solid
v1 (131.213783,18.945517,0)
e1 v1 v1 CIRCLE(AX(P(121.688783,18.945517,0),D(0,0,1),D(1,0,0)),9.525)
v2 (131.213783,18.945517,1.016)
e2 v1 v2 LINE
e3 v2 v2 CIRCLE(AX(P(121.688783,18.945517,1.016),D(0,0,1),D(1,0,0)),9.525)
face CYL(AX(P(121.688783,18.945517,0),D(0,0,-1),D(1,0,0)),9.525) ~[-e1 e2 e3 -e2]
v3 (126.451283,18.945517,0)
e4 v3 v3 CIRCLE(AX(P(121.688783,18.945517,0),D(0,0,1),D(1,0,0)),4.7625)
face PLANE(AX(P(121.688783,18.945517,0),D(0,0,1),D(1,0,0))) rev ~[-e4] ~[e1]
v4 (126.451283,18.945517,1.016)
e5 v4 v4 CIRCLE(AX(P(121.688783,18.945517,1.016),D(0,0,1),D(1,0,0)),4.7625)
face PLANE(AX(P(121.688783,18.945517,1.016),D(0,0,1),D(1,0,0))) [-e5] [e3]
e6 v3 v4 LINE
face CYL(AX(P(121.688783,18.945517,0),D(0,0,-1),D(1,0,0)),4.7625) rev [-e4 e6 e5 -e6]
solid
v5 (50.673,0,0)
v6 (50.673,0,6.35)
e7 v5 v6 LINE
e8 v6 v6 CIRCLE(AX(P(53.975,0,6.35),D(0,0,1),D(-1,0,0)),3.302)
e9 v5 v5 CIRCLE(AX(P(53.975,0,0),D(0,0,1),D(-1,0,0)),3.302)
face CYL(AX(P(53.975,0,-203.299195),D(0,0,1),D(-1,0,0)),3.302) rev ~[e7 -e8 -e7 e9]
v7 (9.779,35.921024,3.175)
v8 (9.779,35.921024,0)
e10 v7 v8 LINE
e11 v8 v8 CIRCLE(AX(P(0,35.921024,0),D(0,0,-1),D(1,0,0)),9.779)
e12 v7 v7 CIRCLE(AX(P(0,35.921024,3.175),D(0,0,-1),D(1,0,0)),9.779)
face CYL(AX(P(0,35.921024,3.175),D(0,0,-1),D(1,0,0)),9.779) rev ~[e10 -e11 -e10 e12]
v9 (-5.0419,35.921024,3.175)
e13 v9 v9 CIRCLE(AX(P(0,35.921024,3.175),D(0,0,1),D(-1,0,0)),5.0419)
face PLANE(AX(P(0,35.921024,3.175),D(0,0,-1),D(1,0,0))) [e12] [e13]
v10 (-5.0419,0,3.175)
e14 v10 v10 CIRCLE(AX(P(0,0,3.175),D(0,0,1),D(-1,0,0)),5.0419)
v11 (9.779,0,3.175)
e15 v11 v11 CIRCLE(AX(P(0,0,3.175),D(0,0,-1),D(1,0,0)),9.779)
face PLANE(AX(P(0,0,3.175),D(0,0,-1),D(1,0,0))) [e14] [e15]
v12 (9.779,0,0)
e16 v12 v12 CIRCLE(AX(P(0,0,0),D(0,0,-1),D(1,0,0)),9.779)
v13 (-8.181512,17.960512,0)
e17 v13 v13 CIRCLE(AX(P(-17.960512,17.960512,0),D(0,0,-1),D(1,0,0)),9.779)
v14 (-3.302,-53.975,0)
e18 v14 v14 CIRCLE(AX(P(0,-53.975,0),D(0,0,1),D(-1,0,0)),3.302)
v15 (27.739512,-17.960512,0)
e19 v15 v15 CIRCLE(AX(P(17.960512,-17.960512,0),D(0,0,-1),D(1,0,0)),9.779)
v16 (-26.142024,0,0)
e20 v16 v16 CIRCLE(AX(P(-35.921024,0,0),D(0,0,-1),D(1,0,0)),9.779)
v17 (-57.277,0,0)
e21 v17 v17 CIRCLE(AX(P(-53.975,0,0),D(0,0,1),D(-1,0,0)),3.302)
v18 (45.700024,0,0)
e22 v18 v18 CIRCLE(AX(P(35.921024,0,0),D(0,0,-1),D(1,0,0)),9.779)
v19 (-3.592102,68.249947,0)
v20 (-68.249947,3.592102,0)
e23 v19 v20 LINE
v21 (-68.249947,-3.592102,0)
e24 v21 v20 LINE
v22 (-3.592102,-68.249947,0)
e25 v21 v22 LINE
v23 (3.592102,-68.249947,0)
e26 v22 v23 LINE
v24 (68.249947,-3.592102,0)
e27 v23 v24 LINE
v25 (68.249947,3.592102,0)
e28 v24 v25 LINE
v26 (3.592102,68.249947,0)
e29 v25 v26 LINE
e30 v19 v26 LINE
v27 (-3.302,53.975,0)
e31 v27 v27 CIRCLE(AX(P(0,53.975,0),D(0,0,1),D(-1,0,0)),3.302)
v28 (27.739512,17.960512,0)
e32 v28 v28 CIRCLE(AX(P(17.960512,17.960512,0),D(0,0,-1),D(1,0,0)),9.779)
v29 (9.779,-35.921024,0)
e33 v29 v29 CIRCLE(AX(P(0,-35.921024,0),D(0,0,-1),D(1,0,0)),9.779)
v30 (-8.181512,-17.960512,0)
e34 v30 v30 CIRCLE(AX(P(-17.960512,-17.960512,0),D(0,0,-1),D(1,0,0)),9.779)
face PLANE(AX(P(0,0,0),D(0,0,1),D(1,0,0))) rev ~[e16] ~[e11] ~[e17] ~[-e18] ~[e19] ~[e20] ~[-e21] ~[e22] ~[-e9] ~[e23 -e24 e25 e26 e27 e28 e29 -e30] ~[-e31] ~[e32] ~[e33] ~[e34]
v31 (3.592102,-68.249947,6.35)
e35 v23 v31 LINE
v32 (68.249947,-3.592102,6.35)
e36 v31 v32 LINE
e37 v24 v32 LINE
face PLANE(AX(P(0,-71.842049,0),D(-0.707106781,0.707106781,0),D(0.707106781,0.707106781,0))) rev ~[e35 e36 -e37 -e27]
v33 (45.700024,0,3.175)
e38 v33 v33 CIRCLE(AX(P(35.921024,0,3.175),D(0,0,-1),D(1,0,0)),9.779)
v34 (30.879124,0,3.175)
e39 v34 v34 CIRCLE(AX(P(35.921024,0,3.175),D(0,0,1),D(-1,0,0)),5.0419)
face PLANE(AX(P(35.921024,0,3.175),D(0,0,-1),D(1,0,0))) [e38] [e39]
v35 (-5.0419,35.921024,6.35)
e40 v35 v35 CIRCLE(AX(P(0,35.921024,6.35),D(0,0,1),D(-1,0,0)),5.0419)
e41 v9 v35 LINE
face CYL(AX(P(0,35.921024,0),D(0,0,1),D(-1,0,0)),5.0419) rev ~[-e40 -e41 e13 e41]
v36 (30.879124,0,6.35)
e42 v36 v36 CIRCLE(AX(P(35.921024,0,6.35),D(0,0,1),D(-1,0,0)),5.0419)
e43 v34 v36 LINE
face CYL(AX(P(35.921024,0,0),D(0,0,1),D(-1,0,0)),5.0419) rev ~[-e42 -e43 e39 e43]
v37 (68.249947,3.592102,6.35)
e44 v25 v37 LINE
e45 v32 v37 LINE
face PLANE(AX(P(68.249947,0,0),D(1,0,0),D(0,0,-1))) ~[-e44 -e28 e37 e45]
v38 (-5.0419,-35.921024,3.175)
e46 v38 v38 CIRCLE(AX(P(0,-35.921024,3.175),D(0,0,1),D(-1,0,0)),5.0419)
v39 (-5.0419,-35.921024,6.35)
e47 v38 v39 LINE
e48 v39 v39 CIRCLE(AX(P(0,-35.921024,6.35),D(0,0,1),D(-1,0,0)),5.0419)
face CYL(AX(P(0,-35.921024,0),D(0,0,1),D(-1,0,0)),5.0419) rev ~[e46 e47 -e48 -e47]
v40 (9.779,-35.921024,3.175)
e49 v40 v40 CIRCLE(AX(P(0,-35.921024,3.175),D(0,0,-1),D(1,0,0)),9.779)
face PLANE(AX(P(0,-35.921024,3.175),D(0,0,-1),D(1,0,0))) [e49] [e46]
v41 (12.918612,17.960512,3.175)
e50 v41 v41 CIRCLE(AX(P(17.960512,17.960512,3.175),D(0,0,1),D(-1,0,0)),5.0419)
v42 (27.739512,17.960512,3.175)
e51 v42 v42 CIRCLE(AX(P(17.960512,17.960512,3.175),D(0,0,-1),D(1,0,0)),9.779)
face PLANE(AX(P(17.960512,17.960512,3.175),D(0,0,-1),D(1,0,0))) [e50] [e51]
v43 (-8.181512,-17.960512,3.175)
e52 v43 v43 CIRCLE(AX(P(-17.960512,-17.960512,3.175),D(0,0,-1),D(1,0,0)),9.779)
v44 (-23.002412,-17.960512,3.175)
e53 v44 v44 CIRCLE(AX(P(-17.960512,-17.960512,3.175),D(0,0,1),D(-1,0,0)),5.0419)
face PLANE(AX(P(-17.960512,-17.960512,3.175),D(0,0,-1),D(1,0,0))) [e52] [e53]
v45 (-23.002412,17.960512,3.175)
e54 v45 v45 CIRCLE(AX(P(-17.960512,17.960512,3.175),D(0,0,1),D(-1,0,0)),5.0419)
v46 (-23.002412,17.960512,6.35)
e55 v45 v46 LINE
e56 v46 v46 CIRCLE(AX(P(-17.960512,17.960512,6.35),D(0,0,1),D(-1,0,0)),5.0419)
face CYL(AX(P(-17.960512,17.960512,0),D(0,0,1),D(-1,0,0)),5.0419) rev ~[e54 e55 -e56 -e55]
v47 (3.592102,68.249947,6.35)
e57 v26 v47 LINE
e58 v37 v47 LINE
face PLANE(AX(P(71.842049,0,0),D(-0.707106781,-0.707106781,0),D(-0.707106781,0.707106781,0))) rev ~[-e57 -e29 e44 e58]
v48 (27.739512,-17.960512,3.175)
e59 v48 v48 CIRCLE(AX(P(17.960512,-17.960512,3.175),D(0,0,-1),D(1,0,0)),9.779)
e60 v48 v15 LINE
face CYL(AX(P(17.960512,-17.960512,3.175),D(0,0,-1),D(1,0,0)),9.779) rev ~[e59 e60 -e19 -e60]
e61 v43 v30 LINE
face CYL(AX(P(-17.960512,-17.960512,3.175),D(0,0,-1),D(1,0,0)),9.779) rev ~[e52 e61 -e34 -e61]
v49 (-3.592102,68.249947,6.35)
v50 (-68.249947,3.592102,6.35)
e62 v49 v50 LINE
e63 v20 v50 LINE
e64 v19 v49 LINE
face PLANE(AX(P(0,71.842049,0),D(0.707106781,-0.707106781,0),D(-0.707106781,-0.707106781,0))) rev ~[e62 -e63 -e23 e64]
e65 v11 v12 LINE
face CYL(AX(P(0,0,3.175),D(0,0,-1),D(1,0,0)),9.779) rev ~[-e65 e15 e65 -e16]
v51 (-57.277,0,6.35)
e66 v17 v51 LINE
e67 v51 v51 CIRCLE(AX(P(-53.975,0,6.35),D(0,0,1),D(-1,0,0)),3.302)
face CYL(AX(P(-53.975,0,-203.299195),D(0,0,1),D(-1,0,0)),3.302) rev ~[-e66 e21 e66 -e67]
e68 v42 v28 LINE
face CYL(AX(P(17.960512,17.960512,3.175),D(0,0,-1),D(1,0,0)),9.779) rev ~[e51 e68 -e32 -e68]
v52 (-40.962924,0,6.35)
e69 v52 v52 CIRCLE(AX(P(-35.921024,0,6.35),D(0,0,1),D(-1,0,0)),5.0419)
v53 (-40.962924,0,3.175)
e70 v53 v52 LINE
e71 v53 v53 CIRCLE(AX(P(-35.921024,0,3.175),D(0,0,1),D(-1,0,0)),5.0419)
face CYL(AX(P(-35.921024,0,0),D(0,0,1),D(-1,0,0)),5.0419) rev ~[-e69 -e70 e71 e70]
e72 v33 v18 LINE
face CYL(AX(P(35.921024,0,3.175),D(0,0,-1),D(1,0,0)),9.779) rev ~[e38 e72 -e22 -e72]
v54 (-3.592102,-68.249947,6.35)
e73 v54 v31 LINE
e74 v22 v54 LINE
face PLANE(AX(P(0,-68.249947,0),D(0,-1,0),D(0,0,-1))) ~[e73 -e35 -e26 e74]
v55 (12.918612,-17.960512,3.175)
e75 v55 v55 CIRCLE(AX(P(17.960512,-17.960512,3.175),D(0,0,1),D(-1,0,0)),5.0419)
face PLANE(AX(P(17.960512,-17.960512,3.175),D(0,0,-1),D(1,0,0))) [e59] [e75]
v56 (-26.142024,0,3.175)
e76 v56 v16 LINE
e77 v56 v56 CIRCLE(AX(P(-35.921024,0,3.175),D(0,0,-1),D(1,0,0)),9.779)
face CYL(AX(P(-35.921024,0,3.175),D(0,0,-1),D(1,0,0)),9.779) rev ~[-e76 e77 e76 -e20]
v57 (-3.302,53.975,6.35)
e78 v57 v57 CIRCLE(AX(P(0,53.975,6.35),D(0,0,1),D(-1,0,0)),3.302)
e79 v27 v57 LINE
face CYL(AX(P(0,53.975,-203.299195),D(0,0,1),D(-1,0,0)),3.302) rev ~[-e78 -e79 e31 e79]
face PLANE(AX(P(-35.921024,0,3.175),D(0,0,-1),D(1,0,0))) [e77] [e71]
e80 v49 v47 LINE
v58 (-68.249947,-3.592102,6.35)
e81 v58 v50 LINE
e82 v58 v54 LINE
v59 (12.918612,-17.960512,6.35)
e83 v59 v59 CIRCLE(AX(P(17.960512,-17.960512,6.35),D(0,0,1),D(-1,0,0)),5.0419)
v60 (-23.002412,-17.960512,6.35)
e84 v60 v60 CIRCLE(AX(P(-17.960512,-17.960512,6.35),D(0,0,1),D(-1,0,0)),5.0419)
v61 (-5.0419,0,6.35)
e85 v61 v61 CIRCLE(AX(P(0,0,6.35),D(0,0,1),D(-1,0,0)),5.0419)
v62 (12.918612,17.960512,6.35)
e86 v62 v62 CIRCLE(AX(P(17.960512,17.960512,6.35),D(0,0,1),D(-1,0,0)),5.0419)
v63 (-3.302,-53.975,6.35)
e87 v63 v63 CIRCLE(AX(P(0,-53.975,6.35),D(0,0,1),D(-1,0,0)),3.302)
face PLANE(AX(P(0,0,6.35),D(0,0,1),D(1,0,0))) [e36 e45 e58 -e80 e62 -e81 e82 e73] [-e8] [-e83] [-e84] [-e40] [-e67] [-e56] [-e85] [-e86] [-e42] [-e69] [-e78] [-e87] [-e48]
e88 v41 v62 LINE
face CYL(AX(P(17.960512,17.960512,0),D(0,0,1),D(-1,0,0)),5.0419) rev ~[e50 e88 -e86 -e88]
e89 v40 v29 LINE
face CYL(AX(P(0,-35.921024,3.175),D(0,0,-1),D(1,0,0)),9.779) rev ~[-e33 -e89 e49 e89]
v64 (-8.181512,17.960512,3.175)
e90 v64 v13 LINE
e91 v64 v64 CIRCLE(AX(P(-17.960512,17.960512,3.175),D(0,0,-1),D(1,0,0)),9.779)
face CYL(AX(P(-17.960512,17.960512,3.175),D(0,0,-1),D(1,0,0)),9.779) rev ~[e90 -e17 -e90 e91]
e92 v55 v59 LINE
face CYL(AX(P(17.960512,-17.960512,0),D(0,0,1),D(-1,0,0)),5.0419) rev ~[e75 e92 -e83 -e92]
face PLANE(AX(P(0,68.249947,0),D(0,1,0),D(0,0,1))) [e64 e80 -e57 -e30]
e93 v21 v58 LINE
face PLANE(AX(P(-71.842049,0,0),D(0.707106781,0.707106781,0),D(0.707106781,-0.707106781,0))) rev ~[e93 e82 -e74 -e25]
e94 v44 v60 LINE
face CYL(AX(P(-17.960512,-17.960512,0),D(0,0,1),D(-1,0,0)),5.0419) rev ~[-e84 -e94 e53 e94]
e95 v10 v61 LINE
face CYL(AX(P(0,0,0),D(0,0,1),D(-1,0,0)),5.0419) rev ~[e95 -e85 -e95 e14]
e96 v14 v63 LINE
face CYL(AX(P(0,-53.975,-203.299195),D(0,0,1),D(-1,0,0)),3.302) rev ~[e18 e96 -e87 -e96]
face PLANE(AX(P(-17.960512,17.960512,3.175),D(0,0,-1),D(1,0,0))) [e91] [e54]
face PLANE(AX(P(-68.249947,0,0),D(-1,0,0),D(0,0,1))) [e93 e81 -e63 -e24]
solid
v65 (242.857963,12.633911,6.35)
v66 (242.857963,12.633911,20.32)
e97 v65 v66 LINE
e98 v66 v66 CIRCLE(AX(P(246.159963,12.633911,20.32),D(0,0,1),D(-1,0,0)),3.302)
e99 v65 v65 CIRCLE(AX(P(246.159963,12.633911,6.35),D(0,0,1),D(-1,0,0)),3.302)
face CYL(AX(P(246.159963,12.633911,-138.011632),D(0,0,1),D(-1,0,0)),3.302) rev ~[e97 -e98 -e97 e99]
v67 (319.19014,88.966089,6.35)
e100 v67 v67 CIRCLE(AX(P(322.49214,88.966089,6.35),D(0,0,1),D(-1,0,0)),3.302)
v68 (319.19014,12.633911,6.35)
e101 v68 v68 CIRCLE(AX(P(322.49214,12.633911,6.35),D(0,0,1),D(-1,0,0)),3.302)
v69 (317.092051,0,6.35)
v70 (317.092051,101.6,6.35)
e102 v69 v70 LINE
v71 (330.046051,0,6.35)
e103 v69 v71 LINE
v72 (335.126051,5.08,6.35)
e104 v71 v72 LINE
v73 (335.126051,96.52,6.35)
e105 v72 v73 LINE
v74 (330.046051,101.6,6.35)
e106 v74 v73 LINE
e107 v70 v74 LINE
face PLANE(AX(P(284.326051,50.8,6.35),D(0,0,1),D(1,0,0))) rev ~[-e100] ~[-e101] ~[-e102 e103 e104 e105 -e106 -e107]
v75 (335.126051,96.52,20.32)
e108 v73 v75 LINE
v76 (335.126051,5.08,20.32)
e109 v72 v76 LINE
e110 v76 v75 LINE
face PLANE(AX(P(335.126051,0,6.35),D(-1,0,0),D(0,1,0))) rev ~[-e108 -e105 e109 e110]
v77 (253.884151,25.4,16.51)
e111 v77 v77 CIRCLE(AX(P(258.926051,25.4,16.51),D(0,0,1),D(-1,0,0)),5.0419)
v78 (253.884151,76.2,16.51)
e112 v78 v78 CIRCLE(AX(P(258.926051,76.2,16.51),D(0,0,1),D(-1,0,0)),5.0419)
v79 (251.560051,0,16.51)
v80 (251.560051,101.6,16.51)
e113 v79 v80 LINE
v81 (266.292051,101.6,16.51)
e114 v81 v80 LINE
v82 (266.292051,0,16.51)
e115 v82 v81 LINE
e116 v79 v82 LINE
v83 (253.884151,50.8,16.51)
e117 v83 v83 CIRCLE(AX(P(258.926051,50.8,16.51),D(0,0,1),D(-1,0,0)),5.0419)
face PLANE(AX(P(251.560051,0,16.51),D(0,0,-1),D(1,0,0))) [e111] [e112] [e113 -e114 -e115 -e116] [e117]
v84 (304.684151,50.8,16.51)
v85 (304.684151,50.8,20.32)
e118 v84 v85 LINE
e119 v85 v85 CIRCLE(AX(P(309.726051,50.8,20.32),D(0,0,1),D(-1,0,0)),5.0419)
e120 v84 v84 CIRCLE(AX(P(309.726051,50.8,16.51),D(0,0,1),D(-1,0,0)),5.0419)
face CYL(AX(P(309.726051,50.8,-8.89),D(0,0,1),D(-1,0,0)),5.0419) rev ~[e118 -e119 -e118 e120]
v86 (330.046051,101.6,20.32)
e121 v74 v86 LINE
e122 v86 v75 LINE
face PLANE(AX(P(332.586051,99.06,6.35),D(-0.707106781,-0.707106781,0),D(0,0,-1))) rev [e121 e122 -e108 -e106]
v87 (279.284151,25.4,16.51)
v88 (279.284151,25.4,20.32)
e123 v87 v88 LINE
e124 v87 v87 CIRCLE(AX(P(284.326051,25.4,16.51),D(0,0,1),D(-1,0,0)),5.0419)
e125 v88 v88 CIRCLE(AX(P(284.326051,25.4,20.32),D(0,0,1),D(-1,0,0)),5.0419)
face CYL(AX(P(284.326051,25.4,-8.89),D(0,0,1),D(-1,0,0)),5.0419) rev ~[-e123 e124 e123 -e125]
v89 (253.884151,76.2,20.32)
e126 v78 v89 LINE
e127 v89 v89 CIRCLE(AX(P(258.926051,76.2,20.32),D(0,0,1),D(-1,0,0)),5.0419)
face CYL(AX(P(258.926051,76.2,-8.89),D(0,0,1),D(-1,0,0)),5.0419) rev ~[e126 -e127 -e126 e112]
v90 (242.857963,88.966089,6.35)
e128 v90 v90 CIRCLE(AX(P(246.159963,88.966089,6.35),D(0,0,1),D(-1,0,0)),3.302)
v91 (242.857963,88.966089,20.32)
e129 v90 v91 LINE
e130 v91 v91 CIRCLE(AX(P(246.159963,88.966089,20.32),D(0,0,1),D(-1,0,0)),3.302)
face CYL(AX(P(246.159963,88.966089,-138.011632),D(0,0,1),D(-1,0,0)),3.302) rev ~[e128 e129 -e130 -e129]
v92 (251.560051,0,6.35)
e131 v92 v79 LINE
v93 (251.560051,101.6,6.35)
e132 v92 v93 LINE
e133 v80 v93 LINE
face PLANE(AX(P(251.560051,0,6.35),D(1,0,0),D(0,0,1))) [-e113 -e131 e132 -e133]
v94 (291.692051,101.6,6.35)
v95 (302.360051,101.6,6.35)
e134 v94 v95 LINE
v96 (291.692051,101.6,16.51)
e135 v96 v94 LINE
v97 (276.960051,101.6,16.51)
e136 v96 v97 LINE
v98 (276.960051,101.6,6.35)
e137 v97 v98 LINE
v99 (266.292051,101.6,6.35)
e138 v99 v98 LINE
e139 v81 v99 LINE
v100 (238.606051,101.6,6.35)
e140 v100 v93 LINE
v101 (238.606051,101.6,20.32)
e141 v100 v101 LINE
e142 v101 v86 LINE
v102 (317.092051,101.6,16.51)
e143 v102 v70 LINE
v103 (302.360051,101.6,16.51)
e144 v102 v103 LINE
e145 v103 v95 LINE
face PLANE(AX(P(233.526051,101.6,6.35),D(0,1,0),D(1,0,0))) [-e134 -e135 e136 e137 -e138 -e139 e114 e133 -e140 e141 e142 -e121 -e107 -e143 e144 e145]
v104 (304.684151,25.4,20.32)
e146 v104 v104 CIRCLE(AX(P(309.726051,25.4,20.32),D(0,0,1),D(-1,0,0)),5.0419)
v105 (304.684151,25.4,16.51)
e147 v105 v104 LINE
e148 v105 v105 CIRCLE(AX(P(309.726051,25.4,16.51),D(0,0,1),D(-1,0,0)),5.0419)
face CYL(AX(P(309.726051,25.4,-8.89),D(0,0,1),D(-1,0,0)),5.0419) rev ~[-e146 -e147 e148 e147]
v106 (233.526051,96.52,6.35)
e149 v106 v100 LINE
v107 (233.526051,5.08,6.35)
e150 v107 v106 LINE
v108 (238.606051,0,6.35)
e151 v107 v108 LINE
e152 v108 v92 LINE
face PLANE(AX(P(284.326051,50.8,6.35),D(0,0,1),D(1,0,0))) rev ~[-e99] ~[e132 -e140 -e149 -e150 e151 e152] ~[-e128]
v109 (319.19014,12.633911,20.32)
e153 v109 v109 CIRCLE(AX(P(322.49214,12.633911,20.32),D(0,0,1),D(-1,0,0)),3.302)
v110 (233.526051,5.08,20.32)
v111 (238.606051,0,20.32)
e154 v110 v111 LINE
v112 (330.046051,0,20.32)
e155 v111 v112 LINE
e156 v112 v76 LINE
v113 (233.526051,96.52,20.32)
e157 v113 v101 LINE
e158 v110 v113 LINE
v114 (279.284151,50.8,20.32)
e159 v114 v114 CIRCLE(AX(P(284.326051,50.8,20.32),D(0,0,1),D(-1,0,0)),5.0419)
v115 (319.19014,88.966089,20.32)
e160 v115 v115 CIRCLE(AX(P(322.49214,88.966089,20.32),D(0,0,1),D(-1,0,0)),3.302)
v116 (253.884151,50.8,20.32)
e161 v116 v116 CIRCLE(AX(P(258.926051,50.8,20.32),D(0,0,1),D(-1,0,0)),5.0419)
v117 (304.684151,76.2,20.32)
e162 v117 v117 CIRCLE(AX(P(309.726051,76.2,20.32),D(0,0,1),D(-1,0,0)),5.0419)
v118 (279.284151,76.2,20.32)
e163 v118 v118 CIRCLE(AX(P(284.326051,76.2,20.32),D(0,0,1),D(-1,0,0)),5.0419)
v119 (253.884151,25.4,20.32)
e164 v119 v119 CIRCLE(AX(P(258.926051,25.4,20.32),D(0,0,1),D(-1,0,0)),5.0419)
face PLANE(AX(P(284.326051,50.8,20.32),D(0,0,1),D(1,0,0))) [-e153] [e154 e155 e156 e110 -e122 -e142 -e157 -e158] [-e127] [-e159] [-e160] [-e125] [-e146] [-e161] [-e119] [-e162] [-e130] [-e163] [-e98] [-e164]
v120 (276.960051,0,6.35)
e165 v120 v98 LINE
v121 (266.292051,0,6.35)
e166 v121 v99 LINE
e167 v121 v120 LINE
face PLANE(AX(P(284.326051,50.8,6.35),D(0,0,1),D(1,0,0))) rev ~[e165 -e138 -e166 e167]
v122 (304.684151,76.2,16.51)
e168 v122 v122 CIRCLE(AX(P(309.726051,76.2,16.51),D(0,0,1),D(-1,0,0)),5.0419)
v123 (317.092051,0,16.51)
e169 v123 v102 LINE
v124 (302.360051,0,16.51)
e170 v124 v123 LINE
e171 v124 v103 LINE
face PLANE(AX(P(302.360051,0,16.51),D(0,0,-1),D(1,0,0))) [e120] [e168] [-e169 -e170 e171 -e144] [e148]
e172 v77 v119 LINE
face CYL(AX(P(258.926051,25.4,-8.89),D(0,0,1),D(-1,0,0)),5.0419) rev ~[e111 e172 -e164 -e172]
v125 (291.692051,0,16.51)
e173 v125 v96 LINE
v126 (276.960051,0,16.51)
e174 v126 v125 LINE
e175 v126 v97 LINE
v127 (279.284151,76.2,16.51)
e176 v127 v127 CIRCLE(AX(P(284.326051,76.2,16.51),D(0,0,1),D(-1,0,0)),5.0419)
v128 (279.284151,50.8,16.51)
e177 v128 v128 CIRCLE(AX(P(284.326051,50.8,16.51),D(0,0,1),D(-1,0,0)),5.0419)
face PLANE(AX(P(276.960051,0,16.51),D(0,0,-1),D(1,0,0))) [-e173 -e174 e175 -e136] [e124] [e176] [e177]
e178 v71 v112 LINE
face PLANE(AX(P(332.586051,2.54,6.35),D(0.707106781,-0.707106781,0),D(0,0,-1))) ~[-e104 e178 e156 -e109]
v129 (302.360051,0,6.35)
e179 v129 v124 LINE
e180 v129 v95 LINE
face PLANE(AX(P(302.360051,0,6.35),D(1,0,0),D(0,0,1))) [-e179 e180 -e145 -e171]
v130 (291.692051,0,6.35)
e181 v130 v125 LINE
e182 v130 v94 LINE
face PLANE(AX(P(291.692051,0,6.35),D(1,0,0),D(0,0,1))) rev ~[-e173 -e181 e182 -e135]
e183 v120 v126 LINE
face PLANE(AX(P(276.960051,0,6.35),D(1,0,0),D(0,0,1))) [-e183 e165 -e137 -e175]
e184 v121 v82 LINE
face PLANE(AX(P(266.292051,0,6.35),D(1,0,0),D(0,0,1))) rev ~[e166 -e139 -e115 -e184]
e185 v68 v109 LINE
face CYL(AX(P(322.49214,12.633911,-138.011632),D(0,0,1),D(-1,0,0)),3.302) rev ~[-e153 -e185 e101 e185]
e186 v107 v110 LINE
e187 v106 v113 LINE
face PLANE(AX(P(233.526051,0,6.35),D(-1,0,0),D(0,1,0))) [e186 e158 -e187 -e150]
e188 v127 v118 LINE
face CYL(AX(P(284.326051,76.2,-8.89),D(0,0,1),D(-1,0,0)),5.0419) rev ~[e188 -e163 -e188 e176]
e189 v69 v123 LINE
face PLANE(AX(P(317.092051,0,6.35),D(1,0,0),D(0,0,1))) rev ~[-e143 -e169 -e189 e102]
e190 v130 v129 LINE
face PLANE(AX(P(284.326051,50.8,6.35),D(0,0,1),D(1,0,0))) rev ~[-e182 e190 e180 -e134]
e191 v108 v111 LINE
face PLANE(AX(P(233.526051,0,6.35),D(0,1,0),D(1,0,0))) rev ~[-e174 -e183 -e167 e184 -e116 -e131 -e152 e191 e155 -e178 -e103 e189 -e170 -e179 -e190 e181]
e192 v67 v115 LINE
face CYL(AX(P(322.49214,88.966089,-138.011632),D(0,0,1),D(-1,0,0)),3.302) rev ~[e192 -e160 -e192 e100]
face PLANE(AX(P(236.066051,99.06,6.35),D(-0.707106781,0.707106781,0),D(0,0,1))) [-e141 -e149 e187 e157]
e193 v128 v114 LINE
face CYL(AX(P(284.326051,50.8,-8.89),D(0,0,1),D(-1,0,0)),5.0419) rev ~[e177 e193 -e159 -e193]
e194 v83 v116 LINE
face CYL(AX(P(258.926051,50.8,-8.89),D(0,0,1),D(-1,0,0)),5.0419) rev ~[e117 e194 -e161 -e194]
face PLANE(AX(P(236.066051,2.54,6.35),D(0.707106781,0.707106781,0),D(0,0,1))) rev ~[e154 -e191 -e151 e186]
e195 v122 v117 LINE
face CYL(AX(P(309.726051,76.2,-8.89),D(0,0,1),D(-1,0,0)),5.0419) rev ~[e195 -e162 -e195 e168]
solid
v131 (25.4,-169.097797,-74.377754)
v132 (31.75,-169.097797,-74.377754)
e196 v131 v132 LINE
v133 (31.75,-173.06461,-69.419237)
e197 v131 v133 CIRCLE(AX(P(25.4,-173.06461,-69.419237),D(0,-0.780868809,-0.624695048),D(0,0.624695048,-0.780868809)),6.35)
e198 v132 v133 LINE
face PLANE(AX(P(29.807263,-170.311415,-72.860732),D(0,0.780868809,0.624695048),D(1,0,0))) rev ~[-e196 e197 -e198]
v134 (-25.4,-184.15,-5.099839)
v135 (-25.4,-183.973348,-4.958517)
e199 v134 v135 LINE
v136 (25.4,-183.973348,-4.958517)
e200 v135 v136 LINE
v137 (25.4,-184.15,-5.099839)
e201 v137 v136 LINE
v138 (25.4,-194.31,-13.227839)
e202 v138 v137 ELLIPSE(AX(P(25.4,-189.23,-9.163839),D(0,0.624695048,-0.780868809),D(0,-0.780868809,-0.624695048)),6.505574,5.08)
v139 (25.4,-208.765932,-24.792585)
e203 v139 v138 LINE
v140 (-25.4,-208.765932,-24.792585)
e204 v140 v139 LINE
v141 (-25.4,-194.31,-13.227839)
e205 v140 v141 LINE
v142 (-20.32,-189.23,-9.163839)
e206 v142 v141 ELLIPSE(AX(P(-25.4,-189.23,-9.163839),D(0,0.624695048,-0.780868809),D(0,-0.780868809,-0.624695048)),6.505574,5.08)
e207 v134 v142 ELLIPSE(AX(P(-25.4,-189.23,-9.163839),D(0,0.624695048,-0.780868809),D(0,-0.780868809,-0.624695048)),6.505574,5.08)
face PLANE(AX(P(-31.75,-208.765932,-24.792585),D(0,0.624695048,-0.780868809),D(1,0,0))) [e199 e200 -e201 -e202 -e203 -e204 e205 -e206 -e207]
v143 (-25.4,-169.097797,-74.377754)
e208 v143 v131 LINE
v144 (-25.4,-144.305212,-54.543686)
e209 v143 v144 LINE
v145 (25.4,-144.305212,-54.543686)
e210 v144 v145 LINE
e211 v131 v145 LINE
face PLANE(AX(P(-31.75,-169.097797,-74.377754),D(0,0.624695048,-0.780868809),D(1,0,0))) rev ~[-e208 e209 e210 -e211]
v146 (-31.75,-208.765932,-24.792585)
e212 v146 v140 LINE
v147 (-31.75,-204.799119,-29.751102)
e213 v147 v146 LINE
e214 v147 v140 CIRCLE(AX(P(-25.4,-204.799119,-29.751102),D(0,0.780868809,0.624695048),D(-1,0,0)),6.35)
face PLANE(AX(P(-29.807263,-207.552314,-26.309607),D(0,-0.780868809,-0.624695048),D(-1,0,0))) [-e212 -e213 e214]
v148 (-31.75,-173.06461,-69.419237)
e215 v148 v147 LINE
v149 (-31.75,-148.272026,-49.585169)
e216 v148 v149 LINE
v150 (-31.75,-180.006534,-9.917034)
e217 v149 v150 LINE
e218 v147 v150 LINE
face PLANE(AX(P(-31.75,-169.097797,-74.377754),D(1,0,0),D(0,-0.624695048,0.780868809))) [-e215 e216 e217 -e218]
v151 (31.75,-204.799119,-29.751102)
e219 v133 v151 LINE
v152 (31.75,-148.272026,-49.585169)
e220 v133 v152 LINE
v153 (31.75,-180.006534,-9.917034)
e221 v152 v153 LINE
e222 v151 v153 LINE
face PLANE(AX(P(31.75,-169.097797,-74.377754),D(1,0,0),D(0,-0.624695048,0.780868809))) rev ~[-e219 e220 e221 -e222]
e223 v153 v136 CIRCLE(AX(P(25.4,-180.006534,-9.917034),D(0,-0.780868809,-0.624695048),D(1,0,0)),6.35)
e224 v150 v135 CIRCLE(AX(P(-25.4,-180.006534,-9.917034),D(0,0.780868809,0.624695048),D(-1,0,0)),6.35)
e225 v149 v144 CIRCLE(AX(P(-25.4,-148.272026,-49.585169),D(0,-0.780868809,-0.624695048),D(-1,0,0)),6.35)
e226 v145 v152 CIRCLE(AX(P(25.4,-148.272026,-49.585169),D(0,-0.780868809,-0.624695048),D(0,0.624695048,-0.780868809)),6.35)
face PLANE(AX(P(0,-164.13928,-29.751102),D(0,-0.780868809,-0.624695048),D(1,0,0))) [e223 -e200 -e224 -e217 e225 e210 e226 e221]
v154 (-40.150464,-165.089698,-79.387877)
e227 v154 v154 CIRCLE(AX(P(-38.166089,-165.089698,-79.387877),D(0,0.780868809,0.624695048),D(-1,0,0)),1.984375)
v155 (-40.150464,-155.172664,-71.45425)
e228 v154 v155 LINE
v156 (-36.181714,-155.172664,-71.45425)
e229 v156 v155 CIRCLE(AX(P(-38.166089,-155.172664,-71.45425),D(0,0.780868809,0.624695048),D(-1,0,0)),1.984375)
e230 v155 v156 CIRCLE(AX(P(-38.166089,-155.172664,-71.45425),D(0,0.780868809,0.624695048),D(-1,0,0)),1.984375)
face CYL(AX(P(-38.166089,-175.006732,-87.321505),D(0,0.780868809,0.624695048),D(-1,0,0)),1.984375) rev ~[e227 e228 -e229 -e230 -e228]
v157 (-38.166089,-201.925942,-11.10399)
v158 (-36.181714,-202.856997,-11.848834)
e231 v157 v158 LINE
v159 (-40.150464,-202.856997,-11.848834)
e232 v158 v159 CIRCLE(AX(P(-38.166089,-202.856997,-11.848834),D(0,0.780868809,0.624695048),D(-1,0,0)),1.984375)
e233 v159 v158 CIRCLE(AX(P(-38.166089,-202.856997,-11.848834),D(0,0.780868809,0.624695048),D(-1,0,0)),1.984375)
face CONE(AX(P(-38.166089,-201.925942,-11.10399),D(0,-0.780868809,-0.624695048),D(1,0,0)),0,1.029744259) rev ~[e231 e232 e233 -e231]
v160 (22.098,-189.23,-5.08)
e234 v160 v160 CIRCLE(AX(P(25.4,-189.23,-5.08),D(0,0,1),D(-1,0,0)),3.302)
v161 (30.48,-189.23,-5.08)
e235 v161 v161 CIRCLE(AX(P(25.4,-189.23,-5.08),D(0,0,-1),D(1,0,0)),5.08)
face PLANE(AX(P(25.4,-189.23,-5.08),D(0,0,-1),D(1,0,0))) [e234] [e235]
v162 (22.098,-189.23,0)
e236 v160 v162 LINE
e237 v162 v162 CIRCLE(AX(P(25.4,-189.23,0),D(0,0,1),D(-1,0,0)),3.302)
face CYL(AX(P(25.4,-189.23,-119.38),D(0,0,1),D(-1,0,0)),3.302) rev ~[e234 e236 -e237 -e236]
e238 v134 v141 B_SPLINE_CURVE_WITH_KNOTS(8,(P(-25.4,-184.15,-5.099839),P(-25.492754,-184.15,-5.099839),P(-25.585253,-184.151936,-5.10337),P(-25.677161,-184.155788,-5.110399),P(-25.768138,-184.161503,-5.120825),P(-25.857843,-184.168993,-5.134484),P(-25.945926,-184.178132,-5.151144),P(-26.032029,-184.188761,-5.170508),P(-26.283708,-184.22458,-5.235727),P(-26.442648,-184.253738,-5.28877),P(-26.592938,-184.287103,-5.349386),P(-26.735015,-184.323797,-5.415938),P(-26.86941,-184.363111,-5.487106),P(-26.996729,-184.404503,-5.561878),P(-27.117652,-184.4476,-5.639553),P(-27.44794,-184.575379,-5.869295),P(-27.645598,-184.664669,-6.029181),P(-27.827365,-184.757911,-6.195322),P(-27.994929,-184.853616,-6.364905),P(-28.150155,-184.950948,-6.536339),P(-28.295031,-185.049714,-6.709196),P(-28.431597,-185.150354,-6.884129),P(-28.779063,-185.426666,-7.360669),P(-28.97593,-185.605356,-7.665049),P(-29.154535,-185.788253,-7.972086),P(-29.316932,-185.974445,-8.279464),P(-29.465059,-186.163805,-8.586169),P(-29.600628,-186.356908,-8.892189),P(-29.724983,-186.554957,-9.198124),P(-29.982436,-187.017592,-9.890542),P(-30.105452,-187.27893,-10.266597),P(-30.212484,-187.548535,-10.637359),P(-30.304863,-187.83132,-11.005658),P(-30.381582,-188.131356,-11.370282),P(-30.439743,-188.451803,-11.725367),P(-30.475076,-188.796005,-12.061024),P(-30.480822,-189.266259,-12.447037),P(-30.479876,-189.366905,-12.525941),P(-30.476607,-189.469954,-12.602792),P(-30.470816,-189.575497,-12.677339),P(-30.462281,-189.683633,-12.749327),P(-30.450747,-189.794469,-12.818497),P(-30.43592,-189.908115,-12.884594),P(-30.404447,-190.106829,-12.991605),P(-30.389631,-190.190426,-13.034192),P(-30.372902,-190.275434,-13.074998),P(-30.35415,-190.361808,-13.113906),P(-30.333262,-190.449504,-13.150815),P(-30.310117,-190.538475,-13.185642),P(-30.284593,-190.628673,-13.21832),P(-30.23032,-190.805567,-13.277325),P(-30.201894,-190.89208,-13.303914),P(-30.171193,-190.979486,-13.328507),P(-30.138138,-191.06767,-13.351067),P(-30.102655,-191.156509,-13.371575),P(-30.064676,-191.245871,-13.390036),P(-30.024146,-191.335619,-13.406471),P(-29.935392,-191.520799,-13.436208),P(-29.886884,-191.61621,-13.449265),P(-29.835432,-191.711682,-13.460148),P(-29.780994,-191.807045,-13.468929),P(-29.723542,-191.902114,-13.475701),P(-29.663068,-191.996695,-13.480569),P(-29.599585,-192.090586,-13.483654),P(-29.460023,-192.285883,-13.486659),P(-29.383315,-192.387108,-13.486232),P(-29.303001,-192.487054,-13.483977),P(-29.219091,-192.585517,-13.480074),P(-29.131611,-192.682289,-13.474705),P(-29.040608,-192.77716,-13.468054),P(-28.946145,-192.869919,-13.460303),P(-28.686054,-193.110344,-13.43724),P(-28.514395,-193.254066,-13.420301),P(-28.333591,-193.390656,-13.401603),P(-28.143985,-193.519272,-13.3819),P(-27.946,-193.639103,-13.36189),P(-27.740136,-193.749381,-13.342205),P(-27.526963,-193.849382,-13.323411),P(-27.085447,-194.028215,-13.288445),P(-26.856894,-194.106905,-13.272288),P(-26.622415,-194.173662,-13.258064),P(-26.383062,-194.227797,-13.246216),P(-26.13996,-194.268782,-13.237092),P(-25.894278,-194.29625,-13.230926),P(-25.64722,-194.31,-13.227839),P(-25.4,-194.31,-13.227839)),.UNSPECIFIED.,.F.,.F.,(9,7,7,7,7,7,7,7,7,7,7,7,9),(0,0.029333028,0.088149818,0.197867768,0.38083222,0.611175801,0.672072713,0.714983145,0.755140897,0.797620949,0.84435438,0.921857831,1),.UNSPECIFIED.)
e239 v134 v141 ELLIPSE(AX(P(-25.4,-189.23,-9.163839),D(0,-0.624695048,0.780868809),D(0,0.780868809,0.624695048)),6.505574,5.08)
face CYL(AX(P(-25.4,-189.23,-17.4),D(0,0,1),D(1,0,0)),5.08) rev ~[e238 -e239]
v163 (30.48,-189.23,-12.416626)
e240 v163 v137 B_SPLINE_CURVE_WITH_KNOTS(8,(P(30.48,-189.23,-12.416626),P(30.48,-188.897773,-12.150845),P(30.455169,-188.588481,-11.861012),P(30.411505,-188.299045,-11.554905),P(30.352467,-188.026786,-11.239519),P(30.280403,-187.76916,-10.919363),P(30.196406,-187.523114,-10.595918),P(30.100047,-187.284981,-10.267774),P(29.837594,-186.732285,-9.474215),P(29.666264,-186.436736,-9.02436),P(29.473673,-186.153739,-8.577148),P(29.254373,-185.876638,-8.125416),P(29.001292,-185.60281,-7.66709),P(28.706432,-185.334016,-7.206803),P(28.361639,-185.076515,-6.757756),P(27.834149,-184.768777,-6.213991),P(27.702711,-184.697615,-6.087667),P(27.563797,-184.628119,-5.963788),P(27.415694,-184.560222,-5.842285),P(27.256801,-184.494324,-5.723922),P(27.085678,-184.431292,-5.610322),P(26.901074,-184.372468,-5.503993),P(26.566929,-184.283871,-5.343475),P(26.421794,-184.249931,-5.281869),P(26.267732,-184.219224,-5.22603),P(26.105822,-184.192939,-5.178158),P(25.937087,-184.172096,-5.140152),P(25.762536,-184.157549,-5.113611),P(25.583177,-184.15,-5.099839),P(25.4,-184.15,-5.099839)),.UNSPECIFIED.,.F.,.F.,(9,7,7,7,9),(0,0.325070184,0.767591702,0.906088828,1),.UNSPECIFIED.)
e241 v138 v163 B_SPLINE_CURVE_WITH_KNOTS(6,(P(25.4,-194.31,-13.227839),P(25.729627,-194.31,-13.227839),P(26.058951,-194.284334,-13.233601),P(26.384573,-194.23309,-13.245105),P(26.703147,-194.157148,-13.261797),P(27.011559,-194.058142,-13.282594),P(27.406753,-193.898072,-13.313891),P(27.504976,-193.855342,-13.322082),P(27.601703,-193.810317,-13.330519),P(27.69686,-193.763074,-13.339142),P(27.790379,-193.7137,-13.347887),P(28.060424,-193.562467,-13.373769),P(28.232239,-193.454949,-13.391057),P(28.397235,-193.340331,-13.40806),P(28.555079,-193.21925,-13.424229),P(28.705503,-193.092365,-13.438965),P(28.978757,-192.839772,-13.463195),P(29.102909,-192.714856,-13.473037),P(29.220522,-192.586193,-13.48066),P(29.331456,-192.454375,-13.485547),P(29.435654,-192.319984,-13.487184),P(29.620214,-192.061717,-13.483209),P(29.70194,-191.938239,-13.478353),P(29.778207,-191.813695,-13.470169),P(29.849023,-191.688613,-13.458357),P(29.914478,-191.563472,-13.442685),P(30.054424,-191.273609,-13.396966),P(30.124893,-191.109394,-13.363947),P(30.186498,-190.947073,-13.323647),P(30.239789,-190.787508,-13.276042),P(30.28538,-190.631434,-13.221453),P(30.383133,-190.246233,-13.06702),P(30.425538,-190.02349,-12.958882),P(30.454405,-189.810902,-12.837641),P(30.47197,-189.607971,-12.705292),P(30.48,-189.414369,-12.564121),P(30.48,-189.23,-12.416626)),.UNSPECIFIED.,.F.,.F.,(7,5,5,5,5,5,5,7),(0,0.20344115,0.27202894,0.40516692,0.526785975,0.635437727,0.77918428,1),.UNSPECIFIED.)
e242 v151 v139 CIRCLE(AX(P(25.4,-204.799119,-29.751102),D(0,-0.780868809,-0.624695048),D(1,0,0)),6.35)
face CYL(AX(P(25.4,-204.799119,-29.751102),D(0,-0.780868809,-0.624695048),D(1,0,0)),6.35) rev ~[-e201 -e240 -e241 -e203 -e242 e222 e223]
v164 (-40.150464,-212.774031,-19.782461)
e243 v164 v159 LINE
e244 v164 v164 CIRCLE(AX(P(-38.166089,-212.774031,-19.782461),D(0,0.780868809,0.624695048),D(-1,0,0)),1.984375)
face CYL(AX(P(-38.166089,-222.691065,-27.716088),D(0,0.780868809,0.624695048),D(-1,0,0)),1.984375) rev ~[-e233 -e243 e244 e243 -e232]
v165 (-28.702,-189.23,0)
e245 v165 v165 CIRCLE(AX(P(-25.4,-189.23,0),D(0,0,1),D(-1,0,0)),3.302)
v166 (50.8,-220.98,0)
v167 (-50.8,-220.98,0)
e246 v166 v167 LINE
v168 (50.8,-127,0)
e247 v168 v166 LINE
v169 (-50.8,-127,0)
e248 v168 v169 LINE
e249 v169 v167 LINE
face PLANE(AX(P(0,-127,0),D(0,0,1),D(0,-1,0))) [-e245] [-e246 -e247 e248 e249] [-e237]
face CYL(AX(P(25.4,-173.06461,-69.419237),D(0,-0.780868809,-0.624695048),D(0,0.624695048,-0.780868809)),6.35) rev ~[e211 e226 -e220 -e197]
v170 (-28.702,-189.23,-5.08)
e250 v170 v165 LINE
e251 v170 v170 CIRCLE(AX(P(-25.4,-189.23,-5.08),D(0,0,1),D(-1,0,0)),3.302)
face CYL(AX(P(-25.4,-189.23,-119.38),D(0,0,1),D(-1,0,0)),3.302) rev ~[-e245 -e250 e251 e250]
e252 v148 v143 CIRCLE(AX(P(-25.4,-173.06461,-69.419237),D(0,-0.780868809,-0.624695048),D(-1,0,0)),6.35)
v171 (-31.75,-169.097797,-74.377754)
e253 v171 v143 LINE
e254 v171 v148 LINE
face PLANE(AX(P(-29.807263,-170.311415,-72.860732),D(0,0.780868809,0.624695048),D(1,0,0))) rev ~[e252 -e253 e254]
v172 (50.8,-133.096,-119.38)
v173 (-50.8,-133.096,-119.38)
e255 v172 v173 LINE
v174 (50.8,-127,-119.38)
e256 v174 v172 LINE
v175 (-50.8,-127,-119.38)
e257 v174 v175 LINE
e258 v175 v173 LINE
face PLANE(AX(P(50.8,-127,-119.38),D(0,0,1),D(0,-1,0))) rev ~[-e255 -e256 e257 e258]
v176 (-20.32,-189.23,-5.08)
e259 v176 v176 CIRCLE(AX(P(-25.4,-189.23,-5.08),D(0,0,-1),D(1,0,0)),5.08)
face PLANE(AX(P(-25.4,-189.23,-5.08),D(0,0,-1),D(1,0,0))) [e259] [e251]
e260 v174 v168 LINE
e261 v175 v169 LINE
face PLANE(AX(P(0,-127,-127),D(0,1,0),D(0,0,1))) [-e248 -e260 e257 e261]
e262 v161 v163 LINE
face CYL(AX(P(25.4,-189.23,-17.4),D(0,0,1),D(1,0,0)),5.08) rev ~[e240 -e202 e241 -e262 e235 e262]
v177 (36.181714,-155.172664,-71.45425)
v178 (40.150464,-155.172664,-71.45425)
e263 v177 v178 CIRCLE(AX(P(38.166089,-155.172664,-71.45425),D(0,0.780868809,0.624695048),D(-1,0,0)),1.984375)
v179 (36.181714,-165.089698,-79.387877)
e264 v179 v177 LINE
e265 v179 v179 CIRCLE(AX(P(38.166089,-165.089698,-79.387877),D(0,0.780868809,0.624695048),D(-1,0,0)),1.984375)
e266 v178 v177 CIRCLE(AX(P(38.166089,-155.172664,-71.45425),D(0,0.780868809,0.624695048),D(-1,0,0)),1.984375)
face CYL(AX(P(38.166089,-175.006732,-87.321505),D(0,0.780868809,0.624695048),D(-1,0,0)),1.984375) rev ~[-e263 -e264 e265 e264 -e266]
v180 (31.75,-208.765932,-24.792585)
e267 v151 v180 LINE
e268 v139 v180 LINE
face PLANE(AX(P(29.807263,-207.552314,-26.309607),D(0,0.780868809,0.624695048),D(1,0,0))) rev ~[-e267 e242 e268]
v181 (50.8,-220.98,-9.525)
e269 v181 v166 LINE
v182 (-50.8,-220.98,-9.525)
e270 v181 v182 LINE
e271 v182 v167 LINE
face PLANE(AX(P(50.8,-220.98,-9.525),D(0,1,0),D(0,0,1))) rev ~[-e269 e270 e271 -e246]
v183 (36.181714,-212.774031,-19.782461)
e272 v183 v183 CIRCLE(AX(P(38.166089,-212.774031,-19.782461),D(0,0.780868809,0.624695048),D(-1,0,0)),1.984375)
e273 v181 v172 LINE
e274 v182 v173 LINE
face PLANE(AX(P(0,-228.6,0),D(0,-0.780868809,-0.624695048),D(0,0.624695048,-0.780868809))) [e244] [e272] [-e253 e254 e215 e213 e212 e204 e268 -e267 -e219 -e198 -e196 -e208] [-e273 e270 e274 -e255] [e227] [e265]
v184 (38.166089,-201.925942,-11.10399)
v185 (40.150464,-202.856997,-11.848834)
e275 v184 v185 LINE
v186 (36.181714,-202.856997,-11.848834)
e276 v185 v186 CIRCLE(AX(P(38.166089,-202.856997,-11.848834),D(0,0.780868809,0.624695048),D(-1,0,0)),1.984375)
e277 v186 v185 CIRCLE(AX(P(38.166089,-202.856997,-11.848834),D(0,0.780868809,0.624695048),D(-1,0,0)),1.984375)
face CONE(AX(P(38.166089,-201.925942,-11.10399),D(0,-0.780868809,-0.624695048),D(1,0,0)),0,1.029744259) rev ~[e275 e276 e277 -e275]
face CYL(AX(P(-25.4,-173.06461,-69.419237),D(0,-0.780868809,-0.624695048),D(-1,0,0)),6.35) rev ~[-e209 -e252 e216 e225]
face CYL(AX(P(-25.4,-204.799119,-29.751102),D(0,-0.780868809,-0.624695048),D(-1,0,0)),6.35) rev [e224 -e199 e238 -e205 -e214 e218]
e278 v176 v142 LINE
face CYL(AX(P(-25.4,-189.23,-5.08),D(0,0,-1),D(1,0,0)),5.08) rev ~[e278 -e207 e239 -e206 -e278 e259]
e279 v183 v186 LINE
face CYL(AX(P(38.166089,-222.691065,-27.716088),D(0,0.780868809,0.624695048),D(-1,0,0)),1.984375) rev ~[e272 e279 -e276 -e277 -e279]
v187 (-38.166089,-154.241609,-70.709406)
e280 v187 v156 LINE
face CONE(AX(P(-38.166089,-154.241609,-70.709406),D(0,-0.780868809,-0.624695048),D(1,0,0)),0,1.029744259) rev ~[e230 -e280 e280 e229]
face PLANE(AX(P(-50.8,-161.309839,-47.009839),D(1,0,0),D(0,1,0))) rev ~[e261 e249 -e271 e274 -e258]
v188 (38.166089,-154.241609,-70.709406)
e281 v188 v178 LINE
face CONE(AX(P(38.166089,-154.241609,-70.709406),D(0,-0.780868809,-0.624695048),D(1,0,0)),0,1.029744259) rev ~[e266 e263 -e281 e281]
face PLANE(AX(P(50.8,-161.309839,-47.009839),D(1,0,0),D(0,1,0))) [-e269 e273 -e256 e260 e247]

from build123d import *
from build123d import SkipClean  # not in build123d's __all__

# Parameters (mm, degrees)
F1_DEPTH        = 6.35
F2_D            = 6.604
F4_D            = 10.0838
F4_CBORE_D      = 19.558
F4_CBORE_DEPTH  = 3.175
F5_SIZE         = 5.08
F6_W            = 101.6
F6_H            = 101.6
F7_DEPTH        = 13.97
F9_D            = 6.604
F10_W           = 14.732
F10_H           = 10.16
F11_DEPTH       = 101.601
F12_SIZE        = 5.08
F13_R           = 9.525
F13_R_2         = 4.7625
F14_DEPTH       = 1.016
F16_DEPTH       = 50.8
F18_D           = 3.96875
F18_DEPTH       = 12.7
F18_TIP         = 1.1923327909
F20_DEPTH       = 119.0509465201
F22_D           = 6.604
F22_CBORE_D     = 10.16
F22_CBORE_DEPTH = 114.3
F23_W           = 63.5
F23_H           = 63.5
F24_DEPTH       = 31.75
F26_D           = 10.0838
F26_DEPTH       = 25.4
F26_TIP         = 3.0294791551
F27_T1_DEPTH    = 47.625
F27_T6_DEPTH    = 31.75
F27_S7_R        = 5.08
F27_T8_DEPTH    = 21
F27_T12_DEPTH   = 31.75
F27_S13_R       = 5.08
F27_T14_DEPTH   = 21


# Not quite as in the source:
# - a fillet or chamfer that OpenCascade refuses, or shapes differently, is made with other operations: its cross-section is extruded or revolved along the edge and cut away or added


with BuildPart() as f1:
    # F0 (on Top) → F1 (new body)
    with BuildSketch(Plane.XY):
        Polygon((-71.8420489686, 0), (0, -71.8420489686), (71.8420489686, 0), (0, 71.8420489686), align=None)
    extrude(amount=F1_DEPTH)

    # F2 (through all)
    with Locations(Plane(origin=(0, 0, 0), x_dir=(1, 0, 0), z_dir=(0, 0, -1))):
        with Locations((0, 53.975), (-53.975, 0), (53.975, 0), (0, -53.975)):
            Hole(F2_D / 2)

    # F4 (through all)
    with Locations(Plane(origin=(0, 0, 0), x_dir=(1, 0, 0), z_dir=(0, 0, -1))):
        with Locations((0, 35.9210244843), (-17.9605122421, 17.9605122421), (-35.9210244843, 0), (-17.9605122421, -17.9605122421), (0, -35.9210244843), (17.9605122421, -17.9605122421), (35.9210244843, 0), (17.9605122421, 17.9605122421), (0, 0)):
            CounterBoreHole(F4_D / 2, F4_CBORE_D / 2, F4_CBORE_DEPTH)

    # F5
    f5_edges = [f1.edges().sort_by_distance(p)[0] for p in [
        (-71.842049, 0, 3.175),
        (0, 71.842049, 3.175),
        (71.842049, 0, 3.175),
        (0, -71.842049, 3.175),
    ]]
    chamfer(f5_edges, length=F5_SIZE)


with BuildPart() as f7:
    # F6 (on face) → F7 (new body)
    with BuildSketch(Plane.XY.offset(6.35)):
        with Locations((284.3260511961, 50.8)):
            Rectangle(F6_W, F6_H)
    extrude(amount=F7_DEPTH)

    # F9 (through all)
    with Locations(Plane(origin=(0, 0, 6.35), x_dir=(1, 0, 0), z_dir=(0, 0, -1))):
        with Locations((246.1599626816, -88.9660885145), (246.1599626816, -12.6339114855), (322.4921397107, -12.6339114855), (322.4921397107, -88.9660885145)):
            Hole(F9_D / 2)

    # F10 (on face) → F11 (cut, through all)
    with BuildSketch(Plane.XZ):
        with Locations((309.7260511961, 11.43)):
            Rectangle(F10_W, F10_H)
        with Locations((284.3260511961, 11.43)):
            Rectangle(F10_W, F10_H)
        with Locations((258.9260511961, 11.43)):
            Rectangle(F10_W, F10_H)
    extrude(amount=-F11_DEPTH, mode=Mode.SUBTRACT)

    # F12
    f12_edges = [f7.edges().sort_by_distance(p)[0] for p in [
        (335.126051, 0, 13.335),
        (233.526051, 0, 13.335),
        (233.526051, 101.6, 13.335),
        (335.126051, 101.6, 13.335),
    ]]
    chamfer(f12_edges, length=F12_SIZE)

    # F26
    with Locations(Plane(origin=(0, 0, 16.51), x_dir=(1, 0, 0), z_dir=(0, 0, -1))):
        with Locations((258.9260511961, -25.4), (258.9260511961, -50.8), (258.9260511961, -76.2), (284.3260511961, -76.2), (284.3260511961, -50.8), (284.3260511961, -25.4), (309.7260511961, -25.4), (309.7260511961, -50.8), (309.7260511961, -76.2)):
            Hole(F26_D / 2, depth=F26_DEPTH)
            with Locations((0, 0, -(F26_DEPTH + F26_TIP / 2))):  # 118° drill point
                Cone(0, F26_D / 2, F26_TIP, mode=Mode.SUBTRACT)


with BuildPart() as f14:
    # F13 (on Top) → F14 (new body)
    with BuildSketch(Plane.XY):
        with Locations((121.6887831688, 18.9455170184)):
            Circle(F13_R)
        with Locations((121.6887831688, 18.9455170184)):
            Circle(F13_R_2, mode=Mode.SUBTRACT)
    extrude(amount=F14_DEPTH)


with BuildPart() as f16:
    # F15 (on Right) → F16 (new body, symmetric)
    with BuildSketch(Plane.YZ):
        Polygon((-127, 0), (-228.6, 0), (-127, -127), align=None)
    extrude(amount=F16_DEPTH, both=True)

    # F18
    with Locations(Plane(origin=(0, -139.3902439024, -111.512195122), x_dir=(1, 0, 0), z_dir=(0, -0.7808688094, -0.6246950476))):
        with Locations((38.1660885145, 41.1391993564), (-38.1660885145, 41.1391993564), (-38.1660885145, 117.4713763855), (38.1660885145, 117.4713763855)):
            Hole(F18_D / 2, depth=F18_DEPTH)
            with Locations((0, 0, -(F18_DEPTH + F18_TIP / 2))):  # 118° drill point
                Cone(0, F18_D / 2, F18_TIP, mode=Mode.SUBTRACT)

    # F19 (on face) → F20 (cut, through all)
    with BuildSketch(Plane.YZ.offset(50.8)):
        Polygon((-228.6, 0), (-220.98, -9.525), (-220.98, 0), align=None)
        Polygon((-127, -119.38), (-133.096, -119.38), (-127, -127), align=None)
    extrude(amount=-F20_DEPTH, mode=Mode.SUBTRACT)

    # F22 (through all)
    with Locations(Plane(origin=(0, 0, -119.38), x_dir=(1, 0, 0), z_dir=(0, 0, -1))):
        with Locations((-25.4, 189.23), (25.4, 189.23)):
            CounterBoreHole(F22_D / 2, F22_CBORE_D / 2, F22_CBORE_DEPTH)

    # F23 (on face) → F24 (cut)
    with BuildSketch(Plane(origin=(0, -139.3902439024, -111.512195122), x_dir=(1, 0, 0), z_dir=(0, -0.7808688094, -0.6246950476))):
        with Locations((0, 79.3052878709)):
            Rectangle(F23_W, F23_H)
    extrude(amount=-F24_DEPTH, mode=Mode.SUBTRACT)

    # F27: fillet of radius 6.35 on 4 edges, made by hand

    # F27_s2 → F27_t1 (join)
    with BuildSketch(Plane(origin=(0, -139.3902439024, -111.512195122), x_dir=(1, 0, 0), z_dir=(0, 0.7808688094, 0.6246950476))):
        with BuildLine():
            ThreePointArc((-31.75, -53.9052878709), (-29.8901280605, -49.4151598104), (-25.4, -47.5552878709))
            Line((-25.4, -47.5552878709), (-31.75, -47.5552878709))
            Line((-31.75, -47.5552878709), (-31.75, -53.9052878709))
        make_face()
        with BuildLine():
            ThreePointArc((25.4, -47.5552878709), (29.8901280605, -49.4151598104), (31.75, -53.9052878709))
            Line((31.75, -53.9052878709), (31.75, -47.5552878709))
            Line((31.75, -47.5552878709), (25.4, -47.5552878709))
        make_face()
    extrude(amount=F27_T1_DEPTH)


with BuildPart() as f27_tool4:
    # F27_s5 → F27_t6 (new body)
    with BuildSketch(Plane(origin=(0, -139.3902439024, -111.512195122), x_dir=(1, 0, 0), z_dir=(0, 0.7808688094, 0.6246950476))):
        with BuildLine():
            ThreePointArc((-31.75, -104.7052878709), (-29.8901280605, -109.1954159315), (-25.4, -111.0552878709))
            Line((-25.4, -111.0552878709), (-31.75, -111.0552878709))
            Line((-31.75, -111.0552878709), (-31.75, -104.7052878709))
        make_face()
    extrude(amount=F27_T6_DEPTH)

    # F27_s7 → F27_t8 (cut, symmetric)
    with BuildSketch(Plane.XY.offset(-17.4)):
        with Locations((-25.4, -189.23)):
            Circle(F27_S7_R)
    extrude(amount=F27_T8_DEPTH, both=True, mode=Mode.SUBTRACT)


with BuildPart() as f16_1:
    add(f16.part, clean=False)

    # F27_t3: union F27_tool4
    add(f27_tool4.part)


with BuildPart() as f27_tool10:
    # F27_s11 → F27_t12 (new body)
    with BuildSketch(Plane(origin=(0, -139.3902439024, -111.512195122), x_dir=(1, 0, 0), z_dir=(0, 0.7808688094, 0.6246950476))):
        with BuildLine():
            ThreePointArc((31.75, -104.7052878709), (29.8901280605, -109.1954159315), (25.4, -111.0552878709))
            Line((25.4, -111.0552878709), (31.75, -111.0552878709))
            Line((31.75, -111.0552878709), (31.75, -104.7052878709))
        make_face()
    extrude(amount=F27_T12_DEPTH)

    # F27_s13 → F27_t14 (cut, symmetric)
    with BuildSketch(Plane.XY.offset(-17.4)):
        with Locations((25.4, -189.23)):
            Circle(F27_S13_R)
    with SkipClean():  # cleaning this boolean's faces spoils the solid; the shape is the same uncleaned
        extrude(amount=F27_T14_DEPTH, both=True, mode=Mode.SUBTRACT)


with BuildPart() as f16_2:
    add(f16_1.part, clean=False)

    # F27_t9: union F27_tool10
    add(f27_tool10.part)


solid = Compound([f1.part, f7.part, f14.part, f16_2.part])
